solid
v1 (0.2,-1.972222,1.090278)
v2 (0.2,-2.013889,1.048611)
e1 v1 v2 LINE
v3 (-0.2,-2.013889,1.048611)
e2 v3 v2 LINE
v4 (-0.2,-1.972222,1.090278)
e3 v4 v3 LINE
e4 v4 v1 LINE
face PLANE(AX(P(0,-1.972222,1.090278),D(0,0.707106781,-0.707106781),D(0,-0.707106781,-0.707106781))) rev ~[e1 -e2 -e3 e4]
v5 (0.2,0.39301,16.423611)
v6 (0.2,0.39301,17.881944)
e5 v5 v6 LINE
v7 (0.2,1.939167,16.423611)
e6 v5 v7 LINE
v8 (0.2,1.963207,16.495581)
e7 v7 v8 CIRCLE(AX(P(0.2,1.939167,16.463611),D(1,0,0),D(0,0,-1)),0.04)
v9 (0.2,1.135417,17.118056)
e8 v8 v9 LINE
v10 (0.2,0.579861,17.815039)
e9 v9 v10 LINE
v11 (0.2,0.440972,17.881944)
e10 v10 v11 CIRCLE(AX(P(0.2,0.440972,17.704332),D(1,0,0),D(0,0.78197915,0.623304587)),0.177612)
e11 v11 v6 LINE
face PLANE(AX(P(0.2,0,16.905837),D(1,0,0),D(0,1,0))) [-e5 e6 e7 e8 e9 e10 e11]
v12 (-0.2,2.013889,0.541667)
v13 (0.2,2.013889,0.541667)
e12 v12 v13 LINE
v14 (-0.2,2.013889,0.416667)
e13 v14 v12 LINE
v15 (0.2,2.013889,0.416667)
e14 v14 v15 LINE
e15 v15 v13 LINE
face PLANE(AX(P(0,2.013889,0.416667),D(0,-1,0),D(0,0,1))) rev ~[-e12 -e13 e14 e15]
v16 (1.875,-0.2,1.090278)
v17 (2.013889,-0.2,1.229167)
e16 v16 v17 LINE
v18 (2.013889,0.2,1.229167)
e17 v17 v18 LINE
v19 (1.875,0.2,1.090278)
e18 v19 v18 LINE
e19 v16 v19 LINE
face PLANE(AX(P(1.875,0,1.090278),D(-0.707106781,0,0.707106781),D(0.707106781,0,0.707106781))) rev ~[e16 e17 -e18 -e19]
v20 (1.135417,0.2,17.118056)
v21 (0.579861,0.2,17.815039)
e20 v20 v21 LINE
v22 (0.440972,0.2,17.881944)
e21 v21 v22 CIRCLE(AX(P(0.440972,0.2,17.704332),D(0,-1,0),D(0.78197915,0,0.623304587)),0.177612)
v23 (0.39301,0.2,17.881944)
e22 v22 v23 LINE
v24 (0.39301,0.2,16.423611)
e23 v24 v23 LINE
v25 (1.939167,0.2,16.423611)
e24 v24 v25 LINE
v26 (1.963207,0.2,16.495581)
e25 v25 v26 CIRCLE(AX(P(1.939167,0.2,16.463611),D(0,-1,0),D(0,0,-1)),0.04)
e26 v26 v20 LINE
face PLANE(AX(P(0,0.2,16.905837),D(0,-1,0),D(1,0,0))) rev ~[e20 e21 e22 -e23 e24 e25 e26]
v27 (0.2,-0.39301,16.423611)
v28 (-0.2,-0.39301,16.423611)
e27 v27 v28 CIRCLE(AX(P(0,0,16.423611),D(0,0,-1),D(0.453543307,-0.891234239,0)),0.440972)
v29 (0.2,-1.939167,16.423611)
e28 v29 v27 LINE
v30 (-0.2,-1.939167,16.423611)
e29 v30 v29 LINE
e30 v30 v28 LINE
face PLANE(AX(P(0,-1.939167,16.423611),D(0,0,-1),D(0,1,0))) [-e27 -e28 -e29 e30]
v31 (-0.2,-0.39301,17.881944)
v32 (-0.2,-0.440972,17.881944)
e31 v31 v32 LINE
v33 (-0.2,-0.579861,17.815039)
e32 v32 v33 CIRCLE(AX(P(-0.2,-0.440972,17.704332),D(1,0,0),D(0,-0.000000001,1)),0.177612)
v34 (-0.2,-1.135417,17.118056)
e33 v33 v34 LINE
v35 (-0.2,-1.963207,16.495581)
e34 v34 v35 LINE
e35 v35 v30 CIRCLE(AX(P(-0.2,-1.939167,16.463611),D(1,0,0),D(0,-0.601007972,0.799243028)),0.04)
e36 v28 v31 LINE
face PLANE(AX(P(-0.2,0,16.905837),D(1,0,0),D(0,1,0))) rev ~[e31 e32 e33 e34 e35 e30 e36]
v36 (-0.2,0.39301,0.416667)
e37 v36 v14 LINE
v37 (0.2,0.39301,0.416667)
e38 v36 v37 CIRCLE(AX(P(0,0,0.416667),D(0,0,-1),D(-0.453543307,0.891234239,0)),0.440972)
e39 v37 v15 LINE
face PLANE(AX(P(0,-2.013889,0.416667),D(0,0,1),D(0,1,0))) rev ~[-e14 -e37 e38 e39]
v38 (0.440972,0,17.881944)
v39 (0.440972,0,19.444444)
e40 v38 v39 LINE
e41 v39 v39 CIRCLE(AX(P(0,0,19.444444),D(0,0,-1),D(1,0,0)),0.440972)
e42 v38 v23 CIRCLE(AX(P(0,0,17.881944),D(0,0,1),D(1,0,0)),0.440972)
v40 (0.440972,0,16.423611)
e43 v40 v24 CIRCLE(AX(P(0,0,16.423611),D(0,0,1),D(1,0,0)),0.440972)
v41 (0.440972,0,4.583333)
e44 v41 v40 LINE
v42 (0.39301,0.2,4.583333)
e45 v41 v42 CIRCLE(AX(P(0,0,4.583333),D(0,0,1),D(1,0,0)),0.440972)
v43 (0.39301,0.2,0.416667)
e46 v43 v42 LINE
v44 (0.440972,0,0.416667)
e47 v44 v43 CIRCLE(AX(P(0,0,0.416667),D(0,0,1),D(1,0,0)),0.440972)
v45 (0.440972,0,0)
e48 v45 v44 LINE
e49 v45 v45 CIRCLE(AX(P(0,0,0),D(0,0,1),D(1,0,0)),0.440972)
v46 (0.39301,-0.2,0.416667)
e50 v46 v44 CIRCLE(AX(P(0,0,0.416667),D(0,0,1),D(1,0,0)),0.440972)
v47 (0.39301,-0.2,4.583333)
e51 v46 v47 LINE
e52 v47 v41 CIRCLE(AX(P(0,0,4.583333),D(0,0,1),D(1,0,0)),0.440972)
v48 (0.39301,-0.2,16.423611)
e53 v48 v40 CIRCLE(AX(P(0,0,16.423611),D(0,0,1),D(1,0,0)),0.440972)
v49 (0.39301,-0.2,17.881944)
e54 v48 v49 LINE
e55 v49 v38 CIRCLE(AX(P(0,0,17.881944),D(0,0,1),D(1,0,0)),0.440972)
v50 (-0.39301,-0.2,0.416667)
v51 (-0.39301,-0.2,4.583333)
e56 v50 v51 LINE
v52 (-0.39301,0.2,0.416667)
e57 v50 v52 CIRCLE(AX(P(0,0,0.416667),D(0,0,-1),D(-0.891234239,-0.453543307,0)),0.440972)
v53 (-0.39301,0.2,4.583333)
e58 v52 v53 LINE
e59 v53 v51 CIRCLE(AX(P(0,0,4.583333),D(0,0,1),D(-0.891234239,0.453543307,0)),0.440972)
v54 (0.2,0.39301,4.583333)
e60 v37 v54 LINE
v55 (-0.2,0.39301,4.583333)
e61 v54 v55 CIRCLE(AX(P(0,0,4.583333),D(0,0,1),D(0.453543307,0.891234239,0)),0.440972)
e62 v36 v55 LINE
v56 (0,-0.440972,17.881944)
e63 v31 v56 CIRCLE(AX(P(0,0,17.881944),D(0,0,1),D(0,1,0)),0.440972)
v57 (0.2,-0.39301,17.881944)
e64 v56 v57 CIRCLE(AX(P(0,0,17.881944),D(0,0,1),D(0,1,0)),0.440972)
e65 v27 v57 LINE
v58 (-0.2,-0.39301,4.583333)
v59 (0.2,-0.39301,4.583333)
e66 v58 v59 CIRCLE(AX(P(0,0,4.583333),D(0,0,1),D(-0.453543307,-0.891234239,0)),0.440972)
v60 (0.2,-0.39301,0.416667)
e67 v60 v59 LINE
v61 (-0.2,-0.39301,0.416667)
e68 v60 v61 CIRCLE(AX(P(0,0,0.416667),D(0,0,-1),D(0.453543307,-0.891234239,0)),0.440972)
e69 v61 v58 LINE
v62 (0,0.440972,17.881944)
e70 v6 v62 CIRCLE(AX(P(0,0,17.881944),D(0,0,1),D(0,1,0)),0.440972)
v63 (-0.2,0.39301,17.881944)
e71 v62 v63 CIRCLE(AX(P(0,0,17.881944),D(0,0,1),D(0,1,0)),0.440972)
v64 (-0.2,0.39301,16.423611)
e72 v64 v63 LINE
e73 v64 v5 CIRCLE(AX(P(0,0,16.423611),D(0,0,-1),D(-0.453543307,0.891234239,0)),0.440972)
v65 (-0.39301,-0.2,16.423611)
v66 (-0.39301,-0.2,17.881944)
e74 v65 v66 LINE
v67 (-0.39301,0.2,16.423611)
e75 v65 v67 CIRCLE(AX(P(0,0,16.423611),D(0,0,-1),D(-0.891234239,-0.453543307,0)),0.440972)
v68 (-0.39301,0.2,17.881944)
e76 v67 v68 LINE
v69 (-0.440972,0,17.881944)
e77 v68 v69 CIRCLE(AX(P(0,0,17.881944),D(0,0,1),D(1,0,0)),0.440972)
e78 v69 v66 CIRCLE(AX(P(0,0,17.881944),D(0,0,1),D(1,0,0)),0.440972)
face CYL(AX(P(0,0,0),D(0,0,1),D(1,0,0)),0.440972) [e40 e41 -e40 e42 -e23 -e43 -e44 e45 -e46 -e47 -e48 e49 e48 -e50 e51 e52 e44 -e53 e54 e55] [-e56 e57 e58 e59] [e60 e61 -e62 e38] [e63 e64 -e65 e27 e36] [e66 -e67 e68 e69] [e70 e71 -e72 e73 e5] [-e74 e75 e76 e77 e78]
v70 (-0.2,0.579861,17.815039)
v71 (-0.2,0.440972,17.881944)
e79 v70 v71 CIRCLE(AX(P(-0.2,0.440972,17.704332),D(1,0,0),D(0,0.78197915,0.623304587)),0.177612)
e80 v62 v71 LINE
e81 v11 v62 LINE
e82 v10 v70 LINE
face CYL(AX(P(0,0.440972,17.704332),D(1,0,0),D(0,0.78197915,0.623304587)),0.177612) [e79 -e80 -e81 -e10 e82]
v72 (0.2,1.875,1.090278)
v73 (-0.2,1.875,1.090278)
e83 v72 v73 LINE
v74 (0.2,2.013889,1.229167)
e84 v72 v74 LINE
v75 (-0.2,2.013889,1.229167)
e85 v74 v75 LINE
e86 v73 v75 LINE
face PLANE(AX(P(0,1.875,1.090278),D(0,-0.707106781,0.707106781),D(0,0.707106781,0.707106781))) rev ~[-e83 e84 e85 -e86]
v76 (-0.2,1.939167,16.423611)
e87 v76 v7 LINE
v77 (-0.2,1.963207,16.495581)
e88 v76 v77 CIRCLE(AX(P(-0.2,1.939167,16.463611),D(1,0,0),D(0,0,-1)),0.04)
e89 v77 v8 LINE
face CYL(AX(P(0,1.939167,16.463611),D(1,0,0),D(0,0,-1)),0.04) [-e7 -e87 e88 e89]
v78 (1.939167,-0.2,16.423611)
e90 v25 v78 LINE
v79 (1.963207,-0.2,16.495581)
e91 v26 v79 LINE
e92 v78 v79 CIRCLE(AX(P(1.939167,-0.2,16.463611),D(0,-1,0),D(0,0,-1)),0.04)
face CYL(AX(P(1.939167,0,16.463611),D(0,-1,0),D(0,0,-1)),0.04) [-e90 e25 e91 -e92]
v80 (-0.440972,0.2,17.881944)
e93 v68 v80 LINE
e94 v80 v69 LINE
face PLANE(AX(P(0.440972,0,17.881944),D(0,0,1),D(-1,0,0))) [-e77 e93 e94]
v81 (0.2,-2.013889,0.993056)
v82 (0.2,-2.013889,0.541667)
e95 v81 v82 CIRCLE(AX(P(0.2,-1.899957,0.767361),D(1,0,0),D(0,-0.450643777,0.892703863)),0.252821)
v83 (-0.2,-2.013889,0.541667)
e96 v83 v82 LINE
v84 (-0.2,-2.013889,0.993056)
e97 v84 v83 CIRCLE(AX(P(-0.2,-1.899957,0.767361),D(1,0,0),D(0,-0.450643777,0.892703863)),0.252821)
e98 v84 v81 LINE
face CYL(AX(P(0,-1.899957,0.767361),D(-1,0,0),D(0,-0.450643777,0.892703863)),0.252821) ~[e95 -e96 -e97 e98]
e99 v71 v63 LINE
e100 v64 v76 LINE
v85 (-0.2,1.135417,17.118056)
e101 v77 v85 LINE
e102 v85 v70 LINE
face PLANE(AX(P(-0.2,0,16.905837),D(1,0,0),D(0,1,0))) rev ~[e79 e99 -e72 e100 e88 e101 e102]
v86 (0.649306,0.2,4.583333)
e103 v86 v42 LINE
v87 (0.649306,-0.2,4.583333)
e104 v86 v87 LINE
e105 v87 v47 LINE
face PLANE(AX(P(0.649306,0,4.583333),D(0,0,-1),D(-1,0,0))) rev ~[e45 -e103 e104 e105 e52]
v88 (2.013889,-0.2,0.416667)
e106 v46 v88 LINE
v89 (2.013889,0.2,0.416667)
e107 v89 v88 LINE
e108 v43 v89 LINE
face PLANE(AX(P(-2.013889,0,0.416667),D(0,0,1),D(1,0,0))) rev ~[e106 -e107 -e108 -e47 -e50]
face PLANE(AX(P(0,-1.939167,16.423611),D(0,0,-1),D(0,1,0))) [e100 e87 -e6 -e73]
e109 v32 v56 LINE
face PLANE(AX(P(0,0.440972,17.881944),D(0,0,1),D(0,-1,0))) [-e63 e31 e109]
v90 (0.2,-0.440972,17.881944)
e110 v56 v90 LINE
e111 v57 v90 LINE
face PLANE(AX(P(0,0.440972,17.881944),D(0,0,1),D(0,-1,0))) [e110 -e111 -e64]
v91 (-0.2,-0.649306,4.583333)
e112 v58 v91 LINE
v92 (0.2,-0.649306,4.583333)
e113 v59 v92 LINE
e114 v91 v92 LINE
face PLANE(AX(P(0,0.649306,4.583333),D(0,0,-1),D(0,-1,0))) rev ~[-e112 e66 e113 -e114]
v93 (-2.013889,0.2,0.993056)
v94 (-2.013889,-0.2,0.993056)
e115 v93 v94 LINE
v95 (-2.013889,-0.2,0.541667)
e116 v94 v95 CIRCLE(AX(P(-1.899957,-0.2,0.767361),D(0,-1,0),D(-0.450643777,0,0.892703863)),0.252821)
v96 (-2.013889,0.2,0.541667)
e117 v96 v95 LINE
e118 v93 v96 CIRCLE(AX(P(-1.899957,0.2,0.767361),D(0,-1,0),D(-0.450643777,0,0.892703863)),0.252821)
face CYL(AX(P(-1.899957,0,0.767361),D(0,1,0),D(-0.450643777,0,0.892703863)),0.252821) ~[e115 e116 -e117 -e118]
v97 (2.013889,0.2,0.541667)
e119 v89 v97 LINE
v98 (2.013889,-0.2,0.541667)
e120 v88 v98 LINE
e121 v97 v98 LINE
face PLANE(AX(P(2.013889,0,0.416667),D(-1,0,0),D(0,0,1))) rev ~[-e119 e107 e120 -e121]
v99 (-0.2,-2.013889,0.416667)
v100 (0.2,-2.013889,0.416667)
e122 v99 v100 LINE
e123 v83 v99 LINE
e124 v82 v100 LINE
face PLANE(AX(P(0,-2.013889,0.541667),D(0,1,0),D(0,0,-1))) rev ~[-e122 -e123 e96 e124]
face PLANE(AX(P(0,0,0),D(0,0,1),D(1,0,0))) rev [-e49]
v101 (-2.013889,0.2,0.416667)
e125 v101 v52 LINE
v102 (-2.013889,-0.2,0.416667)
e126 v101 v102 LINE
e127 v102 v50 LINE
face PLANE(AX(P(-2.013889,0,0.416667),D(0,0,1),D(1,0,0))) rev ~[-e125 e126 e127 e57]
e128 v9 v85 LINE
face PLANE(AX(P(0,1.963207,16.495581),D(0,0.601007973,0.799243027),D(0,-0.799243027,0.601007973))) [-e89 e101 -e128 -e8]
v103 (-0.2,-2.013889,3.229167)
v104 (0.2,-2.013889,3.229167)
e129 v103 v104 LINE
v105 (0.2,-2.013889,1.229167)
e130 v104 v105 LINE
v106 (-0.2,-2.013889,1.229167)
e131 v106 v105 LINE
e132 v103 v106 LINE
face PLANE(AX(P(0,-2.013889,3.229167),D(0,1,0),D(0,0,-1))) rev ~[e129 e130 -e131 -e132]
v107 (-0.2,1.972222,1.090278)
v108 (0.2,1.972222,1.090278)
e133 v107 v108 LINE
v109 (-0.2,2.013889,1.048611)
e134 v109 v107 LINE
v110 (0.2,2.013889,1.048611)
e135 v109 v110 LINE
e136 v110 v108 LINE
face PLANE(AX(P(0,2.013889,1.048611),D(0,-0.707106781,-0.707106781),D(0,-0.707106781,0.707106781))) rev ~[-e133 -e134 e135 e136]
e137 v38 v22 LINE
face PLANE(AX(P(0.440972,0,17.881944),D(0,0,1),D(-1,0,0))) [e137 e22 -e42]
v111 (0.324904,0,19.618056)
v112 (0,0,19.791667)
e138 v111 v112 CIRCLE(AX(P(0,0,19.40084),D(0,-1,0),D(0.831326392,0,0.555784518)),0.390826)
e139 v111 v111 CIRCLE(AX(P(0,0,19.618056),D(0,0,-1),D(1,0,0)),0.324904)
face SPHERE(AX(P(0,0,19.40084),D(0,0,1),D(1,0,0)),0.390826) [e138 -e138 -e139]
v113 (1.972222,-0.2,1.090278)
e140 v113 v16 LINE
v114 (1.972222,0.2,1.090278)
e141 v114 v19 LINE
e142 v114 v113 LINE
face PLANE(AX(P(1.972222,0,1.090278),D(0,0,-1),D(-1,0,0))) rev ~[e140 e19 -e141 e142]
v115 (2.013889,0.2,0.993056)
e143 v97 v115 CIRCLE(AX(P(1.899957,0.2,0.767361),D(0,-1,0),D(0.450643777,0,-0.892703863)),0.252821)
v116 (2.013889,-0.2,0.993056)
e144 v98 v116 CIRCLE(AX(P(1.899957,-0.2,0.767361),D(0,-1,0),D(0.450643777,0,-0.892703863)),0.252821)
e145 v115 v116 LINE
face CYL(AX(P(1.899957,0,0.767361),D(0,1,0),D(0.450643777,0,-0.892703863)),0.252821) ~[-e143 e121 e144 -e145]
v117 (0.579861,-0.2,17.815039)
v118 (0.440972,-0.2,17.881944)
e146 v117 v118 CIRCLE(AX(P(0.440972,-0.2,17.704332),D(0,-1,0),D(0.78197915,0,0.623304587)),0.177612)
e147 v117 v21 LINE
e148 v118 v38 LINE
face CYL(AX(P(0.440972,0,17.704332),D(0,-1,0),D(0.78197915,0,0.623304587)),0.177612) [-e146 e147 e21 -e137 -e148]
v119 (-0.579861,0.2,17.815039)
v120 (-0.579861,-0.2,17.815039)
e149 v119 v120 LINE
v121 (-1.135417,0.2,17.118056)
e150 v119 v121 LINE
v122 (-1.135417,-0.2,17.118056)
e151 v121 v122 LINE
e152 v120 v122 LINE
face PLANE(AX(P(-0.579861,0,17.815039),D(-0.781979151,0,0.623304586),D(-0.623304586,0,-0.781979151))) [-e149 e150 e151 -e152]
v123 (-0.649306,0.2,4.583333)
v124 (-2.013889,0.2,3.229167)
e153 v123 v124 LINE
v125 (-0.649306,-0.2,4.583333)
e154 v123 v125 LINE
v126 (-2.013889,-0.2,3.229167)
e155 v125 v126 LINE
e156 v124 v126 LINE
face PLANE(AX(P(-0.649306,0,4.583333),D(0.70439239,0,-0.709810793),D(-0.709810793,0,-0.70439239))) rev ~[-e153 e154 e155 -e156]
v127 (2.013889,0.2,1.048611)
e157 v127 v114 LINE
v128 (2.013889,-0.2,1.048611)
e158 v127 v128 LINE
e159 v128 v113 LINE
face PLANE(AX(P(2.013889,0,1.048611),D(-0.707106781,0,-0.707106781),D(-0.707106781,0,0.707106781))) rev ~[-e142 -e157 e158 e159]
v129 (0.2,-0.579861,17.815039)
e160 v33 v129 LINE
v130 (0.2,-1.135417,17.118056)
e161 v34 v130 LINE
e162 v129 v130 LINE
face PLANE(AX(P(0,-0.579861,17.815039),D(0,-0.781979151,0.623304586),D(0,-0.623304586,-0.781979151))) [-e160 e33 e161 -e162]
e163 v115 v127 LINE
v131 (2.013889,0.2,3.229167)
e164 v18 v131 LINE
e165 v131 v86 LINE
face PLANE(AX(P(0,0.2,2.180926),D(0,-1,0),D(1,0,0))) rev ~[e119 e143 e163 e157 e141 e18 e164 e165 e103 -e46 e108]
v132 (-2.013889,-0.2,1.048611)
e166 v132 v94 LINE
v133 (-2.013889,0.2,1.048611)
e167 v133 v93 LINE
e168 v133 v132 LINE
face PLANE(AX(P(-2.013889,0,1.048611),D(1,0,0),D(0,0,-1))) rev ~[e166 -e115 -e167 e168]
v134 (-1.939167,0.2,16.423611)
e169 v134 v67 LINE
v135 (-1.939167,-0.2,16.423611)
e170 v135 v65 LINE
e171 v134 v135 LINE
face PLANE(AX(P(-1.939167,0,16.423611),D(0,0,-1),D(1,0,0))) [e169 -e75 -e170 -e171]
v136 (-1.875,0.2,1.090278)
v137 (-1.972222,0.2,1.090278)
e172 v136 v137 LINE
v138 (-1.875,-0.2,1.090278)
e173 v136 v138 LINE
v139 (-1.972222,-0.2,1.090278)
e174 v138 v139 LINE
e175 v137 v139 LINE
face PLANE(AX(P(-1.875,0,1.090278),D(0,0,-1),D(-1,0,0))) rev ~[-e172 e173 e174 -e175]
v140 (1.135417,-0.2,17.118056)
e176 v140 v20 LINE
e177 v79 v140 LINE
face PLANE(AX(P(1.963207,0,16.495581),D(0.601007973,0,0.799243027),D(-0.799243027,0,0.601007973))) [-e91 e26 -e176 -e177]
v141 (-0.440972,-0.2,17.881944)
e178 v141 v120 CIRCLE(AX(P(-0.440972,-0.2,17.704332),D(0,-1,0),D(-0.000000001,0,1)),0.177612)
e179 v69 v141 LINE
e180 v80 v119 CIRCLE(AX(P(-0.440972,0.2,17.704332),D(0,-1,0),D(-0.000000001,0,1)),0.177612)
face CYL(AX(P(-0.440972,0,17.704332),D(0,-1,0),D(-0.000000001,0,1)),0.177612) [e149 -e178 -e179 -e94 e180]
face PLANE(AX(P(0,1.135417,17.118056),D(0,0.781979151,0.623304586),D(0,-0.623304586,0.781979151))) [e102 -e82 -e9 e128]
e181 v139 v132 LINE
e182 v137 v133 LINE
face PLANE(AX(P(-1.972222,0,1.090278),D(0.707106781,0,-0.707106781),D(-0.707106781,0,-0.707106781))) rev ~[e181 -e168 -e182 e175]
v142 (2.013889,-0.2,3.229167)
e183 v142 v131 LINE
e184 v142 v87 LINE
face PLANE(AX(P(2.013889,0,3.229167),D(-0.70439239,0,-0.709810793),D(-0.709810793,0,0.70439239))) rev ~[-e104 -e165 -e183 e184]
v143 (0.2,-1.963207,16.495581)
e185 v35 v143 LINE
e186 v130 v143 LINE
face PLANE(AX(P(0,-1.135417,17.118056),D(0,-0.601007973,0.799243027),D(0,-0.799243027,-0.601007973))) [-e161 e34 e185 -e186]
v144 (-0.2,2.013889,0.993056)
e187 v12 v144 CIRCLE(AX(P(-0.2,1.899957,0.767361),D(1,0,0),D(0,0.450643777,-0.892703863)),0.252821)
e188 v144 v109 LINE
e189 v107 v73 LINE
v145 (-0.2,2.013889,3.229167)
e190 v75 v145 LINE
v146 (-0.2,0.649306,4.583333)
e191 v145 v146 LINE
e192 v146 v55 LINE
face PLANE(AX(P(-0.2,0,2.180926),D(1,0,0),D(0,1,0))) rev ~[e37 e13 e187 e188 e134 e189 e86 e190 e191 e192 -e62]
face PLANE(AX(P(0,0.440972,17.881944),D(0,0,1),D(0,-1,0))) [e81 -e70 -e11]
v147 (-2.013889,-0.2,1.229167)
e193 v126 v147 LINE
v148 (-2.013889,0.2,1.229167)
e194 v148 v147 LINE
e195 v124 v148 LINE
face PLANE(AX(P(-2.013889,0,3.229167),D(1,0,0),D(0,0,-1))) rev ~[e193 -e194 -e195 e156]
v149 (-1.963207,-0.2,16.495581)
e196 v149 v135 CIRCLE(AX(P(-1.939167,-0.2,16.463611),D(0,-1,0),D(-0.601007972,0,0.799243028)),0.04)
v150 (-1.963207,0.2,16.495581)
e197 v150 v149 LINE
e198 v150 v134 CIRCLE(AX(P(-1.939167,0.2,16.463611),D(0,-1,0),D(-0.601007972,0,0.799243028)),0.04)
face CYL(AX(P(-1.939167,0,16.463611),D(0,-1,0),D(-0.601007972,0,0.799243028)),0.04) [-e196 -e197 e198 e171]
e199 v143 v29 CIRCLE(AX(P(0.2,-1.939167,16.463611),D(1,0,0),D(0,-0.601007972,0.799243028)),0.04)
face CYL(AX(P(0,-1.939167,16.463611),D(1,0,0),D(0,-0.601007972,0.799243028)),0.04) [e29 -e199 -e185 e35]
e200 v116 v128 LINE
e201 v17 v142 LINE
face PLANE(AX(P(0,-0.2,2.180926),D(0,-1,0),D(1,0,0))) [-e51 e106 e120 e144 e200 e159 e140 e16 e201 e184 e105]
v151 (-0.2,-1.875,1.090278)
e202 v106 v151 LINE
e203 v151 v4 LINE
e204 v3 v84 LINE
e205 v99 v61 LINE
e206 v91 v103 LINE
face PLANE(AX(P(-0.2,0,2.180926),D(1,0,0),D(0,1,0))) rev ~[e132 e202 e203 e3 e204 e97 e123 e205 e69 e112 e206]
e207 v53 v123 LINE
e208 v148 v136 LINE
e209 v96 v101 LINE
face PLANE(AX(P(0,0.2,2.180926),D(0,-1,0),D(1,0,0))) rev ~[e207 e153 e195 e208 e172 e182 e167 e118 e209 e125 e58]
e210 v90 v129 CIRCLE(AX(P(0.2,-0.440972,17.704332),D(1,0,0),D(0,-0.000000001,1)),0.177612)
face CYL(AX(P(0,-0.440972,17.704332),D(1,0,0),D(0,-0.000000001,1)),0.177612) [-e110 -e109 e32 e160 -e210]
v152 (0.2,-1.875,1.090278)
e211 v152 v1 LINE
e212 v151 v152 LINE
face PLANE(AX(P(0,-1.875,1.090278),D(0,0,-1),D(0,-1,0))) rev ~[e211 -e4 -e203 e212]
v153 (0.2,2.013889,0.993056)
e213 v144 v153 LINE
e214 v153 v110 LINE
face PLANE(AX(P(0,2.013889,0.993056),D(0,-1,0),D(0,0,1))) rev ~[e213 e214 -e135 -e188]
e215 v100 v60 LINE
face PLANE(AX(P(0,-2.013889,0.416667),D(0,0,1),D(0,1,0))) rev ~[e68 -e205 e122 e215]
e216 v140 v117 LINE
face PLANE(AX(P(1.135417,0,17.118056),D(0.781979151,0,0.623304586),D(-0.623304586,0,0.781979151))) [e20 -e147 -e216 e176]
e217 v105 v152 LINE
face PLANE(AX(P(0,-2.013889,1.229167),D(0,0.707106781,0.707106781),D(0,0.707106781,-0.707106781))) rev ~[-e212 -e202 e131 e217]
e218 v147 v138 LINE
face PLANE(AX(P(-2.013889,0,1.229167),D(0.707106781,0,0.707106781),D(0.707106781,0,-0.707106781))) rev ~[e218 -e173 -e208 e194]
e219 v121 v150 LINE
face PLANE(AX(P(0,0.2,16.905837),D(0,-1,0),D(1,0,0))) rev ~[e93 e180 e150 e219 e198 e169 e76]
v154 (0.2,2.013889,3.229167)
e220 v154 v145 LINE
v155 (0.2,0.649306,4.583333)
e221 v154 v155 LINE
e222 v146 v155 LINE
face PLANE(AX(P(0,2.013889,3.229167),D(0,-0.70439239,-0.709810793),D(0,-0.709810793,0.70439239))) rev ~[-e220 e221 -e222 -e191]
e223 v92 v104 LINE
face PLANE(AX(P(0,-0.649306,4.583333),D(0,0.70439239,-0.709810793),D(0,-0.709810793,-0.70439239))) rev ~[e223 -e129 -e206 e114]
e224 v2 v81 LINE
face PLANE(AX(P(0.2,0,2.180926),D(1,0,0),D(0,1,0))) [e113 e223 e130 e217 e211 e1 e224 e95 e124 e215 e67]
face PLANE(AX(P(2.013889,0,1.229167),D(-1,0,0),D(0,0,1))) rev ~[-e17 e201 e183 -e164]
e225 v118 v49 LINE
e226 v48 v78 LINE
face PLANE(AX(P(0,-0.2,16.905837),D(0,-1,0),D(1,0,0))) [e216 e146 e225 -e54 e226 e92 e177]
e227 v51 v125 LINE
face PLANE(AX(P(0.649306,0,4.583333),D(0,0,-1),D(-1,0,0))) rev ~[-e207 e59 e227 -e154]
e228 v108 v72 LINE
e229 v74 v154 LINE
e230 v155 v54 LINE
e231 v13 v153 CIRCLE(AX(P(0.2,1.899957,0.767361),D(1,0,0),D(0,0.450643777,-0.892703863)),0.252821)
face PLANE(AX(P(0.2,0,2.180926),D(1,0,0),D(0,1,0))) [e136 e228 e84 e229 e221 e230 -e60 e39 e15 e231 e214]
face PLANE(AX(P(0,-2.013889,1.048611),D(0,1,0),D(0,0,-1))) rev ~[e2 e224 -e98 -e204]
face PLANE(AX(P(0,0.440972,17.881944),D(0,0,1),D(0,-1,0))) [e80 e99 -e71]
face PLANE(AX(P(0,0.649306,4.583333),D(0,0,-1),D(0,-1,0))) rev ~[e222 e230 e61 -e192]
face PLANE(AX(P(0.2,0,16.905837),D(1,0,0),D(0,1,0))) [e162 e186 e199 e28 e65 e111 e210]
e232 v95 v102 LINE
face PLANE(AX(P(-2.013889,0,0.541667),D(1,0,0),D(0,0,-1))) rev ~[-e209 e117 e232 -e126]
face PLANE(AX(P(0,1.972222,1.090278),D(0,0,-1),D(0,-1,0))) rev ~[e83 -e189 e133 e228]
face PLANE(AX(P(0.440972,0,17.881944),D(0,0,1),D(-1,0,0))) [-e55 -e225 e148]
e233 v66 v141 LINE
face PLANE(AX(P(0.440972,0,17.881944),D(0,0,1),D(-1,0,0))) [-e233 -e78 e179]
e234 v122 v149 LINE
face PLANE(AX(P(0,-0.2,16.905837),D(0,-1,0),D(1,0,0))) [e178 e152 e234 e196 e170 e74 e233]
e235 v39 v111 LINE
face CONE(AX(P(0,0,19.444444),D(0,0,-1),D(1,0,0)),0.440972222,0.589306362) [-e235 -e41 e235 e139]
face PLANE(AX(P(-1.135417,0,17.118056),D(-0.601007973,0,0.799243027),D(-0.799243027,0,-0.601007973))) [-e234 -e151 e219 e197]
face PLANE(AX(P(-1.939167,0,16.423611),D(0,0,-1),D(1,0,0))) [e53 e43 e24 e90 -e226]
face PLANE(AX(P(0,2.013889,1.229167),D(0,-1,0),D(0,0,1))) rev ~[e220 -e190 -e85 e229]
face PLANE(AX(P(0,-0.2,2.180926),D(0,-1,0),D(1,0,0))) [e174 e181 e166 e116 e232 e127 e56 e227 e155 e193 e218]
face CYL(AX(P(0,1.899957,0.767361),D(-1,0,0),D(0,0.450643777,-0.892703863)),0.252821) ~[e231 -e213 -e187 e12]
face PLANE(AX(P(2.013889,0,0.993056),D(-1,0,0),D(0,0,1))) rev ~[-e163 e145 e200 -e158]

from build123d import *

# Parameters (mm, degrees)
F3_DEPTH = 0.2
F5_COUNT = 4


# Not quite as in the source:
# - a feature of the source that left no trace in its solid (it failed there, or was rolled back) is left out


with BuildPart() as f1:
    # F0 (on Front) → F1 (revolve)
    with BuildSketch(Plane.XZ):
        with BuildLine():
            Line((0, 19.7916666667), (0, 0))
            Line((0, 0), (0.4409722222, 0))
            Line((0.4409722222, 0), (0.4409722222, 19.4444444444))
            Line((0.4409722222, 19.4444444444), (0.3249042511, 19.6180555556))
            ThreePointArc((0.3249042511, 19.6180555556), (0.1841898411, 19.745542126), (0, 19.7916666667))
        make_face()
    revolve(axis=Axis((0, 0, 9.8958333333), (0, 0, 1)))

    # F2 (on Front) → F3 (join, symmetric)
    with BuildSketch(Plane.XZ):
        with BuildLine():
            Line((2.0138888889, 3.2291666667), (0.6493055556, 4.5833333333))
            Line((0.6493055556, 4.5833333333), (-0.6493055556, 4.5833333333))
            Line((-0.6493055556, 4.5833333333), (-2.0138888889, 3.2291666667))
            Line((-2.0138888889, 3.2291666667), (-2.0138888889, 1.2291666667))
            Line((-2.0138888889, 1.2291666667), (-1.875, 1.0902777778))
            Line((-1.875, 1.0902777778), (-1.9722222222, 1.0902777778))
            Line((-1.9722222222, 1.0902777778), (-2.0138888889, 1.0486111111))
            Line((-2.0138888889, 1.0486111111), (-2.0138888889, 0.9930555556))
            ThreePointArc((-2.0138888889, 0.9930555556), (-2.1527777778, 0.7673611111), (-2.0138888889, 0.5416666667))
            Line((-2.0138888889, 0.5416666667), (-2.0138888889, 0.4166666667))
            Line((-2.0138888889, 0.4166666667), (2.0138888889, 0.4166666667))
            Line((2.0138888889, 0.4166666667), (2.0138888889, 0.5416666667))
            ThreePointArc((2.0138888889, 0.5416666667), (2.1527777778, 0.7673611111), (2.0138888889, 0.9930555556))
            Line((2.0138888889, 0.9930555556), (2.0138888889, 1.0486111111))
            Line((2.0138888889, 1.0486111111), (1.9722222222, 1.0902777778))
            Line((1.9722222222, 1.0902777778), (1.875, 1.0902777778))
            Line((1.875, 1.0902777778), (2.0138888889, 1.2291666667))
            Line((2.0138888889, 1.2291666667), (2.0138888889, 3.2291666667))
        make_face()
        with BuildLine():
            Line((0.4409722222, 17.8819444444), (-0.4409722222, 17.8819444444))
            ThreePointArc((-0.4409722222, 17.8819444444), (-0.5180541376, 17.8643461976), (-0.5798611111, 17.8150388148))
            Line((-0.5798611111, 17.8150388148), (-1.1354166667, 17.1180555556))
            Line((-1.1354166667, 17.1180555556), (-1.9632069856, 16.4955808322))
            ThreePointArc((-1.9632069856, 16.4955808322), (-1.9771060186, 16.4509380855), (-1.9391666667, 16.4236111111))
            Line((-1.9391666667, 16.4236111111), (1.9391666667, 16.4236111111))
            ThreePointArc((1.9391666667, 16.4236111111), (1.9771060186, 16.4509380855), (1.9632069856, 16.4955808322))
            Line((1.9632069856, 16.4955808322), (1.1354166667, 17.1180555556))
            Line((1.1354166667, 17.1180555556), (0.5798611111, 17.8150388148))
            ThreePointArc((0.5798611111, 17.8150388148), (0.5180541376, 17.8643461976), (0.4409722222, 17.8819444444))
        make_face()
    extrude(amount=F3_DEPTH, both=True)

    # F5: F1 ×4 about axis
    f5_axis = Axis((0, 0, 0), (0, 0, 1))


with BuildPart() as f1_1:
    add(f1.part)
    for i in range(1, F5_COUNT):
        add(f1.part.rotate(f5_axis, i * 360 / F5_COUNT))


solid = f1_1.part
